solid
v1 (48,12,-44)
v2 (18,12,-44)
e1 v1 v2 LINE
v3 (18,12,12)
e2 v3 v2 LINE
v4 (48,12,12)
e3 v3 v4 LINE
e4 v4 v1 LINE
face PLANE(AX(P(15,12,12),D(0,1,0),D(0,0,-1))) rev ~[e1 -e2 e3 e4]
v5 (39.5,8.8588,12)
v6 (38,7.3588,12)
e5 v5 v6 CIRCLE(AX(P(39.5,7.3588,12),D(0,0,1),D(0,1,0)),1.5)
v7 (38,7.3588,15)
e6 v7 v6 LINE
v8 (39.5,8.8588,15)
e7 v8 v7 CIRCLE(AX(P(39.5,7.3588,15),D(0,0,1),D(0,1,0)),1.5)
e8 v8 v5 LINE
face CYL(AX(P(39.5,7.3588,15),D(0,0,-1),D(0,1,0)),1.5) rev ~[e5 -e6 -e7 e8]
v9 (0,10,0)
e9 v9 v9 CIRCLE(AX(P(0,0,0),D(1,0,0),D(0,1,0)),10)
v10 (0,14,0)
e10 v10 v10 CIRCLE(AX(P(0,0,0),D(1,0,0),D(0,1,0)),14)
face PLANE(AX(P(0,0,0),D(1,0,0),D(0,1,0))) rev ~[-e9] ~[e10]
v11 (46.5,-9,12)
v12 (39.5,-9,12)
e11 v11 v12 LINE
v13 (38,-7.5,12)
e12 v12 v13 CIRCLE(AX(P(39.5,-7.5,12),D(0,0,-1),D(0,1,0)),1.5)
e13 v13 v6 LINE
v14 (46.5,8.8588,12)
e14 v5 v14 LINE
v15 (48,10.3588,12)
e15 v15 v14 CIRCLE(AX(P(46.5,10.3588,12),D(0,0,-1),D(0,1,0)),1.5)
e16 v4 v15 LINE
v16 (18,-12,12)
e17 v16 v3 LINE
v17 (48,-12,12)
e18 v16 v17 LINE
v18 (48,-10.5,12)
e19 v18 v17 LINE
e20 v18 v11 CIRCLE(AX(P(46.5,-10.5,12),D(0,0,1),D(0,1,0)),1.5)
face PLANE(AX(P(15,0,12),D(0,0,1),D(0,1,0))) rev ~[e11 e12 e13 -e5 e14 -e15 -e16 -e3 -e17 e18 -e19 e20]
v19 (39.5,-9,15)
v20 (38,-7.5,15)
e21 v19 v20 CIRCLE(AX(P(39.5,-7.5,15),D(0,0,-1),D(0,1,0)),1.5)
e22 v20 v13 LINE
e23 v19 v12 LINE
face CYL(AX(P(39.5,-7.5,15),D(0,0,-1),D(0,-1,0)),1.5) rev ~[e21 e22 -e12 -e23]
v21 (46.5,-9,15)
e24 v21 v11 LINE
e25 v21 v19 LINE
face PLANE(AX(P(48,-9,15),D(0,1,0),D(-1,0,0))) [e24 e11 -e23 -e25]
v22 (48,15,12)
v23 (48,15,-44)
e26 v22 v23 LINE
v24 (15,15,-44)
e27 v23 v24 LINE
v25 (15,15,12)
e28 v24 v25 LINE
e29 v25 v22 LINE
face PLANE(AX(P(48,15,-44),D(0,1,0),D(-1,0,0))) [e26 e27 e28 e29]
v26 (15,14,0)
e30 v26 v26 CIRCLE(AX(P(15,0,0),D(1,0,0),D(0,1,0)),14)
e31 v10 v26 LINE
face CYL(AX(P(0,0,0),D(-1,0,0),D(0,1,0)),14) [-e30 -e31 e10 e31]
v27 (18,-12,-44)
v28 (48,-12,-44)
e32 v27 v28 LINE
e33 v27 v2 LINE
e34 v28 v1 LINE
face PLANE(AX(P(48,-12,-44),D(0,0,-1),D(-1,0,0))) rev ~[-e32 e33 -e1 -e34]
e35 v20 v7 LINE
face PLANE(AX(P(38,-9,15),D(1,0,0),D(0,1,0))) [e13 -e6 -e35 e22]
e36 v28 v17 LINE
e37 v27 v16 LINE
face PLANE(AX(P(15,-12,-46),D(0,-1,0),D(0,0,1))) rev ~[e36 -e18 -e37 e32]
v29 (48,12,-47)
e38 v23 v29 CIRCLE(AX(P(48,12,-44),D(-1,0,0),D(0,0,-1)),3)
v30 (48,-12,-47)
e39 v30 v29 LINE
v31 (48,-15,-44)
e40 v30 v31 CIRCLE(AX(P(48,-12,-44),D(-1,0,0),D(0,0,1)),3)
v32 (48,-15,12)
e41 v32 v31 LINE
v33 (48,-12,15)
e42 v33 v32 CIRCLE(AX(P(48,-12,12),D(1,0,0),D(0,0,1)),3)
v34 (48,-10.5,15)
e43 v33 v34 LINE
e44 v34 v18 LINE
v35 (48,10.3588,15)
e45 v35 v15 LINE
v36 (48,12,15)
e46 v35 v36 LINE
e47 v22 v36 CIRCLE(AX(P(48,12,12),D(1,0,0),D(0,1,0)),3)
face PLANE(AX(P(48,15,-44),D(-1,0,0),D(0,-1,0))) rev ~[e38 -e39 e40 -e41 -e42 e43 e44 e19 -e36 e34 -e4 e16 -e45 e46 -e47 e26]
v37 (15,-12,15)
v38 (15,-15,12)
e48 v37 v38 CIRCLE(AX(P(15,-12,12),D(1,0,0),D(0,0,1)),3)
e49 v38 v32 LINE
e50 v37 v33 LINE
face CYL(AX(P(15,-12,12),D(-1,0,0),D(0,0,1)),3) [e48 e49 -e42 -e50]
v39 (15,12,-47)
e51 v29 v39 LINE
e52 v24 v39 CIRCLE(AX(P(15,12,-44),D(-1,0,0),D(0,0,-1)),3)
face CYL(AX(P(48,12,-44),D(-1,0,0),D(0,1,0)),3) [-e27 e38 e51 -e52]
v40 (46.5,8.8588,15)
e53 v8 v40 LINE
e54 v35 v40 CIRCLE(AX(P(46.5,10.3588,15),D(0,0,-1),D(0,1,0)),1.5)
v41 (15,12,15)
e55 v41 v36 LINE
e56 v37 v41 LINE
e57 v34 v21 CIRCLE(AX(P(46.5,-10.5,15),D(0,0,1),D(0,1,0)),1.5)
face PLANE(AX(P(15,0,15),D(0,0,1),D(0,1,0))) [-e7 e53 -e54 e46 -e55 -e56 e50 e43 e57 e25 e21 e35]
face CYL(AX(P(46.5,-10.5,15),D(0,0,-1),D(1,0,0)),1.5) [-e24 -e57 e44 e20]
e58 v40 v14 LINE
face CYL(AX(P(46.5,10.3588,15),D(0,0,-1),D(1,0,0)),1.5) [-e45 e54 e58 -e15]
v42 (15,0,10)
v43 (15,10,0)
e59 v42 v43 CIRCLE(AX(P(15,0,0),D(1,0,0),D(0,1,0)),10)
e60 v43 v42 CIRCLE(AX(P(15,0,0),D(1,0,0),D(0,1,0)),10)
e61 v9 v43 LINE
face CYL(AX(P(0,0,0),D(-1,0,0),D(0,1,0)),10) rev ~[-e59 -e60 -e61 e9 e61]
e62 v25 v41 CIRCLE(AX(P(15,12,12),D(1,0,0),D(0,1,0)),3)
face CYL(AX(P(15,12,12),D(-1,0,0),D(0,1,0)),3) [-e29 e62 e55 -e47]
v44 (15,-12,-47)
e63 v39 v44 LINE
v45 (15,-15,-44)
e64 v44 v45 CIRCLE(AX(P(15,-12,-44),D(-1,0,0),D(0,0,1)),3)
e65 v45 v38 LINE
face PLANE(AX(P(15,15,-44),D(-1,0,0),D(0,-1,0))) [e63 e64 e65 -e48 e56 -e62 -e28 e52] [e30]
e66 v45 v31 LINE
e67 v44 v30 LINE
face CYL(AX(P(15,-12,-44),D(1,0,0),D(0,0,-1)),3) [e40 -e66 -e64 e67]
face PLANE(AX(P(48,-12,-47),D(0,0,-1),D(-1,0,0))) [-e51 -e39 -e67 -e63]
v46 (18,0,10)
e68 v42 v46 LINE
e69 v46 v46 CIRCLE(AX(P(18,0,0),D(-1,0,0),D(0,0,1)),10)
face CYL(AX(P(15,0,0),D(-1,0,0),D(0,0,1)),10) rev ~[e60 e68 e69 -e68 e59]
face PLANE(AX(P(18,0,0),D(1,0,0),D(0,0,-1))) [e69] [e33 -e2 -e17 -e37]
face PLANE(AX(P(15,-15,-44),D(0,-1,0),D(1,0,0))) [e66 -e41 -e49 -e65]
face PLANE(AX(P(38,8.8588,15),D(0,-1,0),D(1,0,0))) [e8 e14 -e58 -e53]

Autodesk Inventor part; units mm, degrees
ref_plane "YZ Plane" through (0, 0, 0) normal (1, 0, 0) x (0, 1, 0)
ref_plane "XZ Plane" through (0, 0, 0) normal (0, 1, 0) x (-1, 0, 0)
ref_plane "XY Plane" through (0, 0, 0) normal (0, 0, 1) x (1, 0, 0)
sketch "Sketch1" plane through (0, 0, 0) normal (1, 0, 0) x (0, 1, 0)
  circle A0 centre (0, 0) radius 10
  circle A1 centre (0, 0) radius 14
  dimension "d0" = 20
  dimension "d1" = 28
extrude "Extrusion1" add sketch "Sketch1" along normal blind 15
sketch "Sketch2" plane through (15, 0, 0) normal (1, 0, 0) x (0, 0, -1)
  point P0 (0, 0)
sketch "Sketch3" plane through (15, 0, 0) normal (1, 0, 0) x (0, 0, -1)
  circle A0 centre (0, 0) radius 10 projected
  line L0 (-12, 0) -> (-12, 12)
  line L1 (-12, 12) -> (46, 12)
  line L2 (46, 12) -> (46, -12)
  line L3 (46, -12) -> (-12, -12)
  line L4 (-12, -12) -> (-12, 0)
  line L5 (-15, 0) -> (-15, -12)
  line L6 (-15, 0) -> (-15, 12)
  line L7 (-12, 15) -> (46, 15)
  line L8 (49, 12) -> (49, -12)
  line L9 (46, -15) -> (-12, -15)
  arc A1 (49, 12) -> (46, 15) centre (46, 12) ccw
  arc A2 (46, -15) -> (49, -12) centre (46, -12) ccw
  arc A3 (-15, -12) -> (-12, -15) centre (-12, -12) ccw
  arc A4 (-12, 15) -> (-15, 12) centre (-12, 12) ccw
extrude "Extrusion2" add sketch "Sketch3" along normal blind 33 contours L6 A4 L7 A1 L8 A2 L9 A3 L5
sketch "Sketch4" plane through (15, 0, 0) normal (1, 0, 0) x (0, 0, -1)
  line L0 (-12, -12) -> (-12, 12) projected
  line L1 (7.2111, 12) -> (46, 12) projected
  line L2 (-12, 12) -> (46, 12)
  line L3 (46, 12) -> (46, -12)
  line L4 (46, -12) -> (-12, -12) projected
  line L5 (46, -12) -> (-12, -12)
  line L6 (-12, 12) -> (46, 12) projected
  line L7 (-12, -12) -> (-12, 12)
  point P0 (0, 0)
extrude "Extrusion3" add sketch "Sketch4" along normal blind 3
sketch "Sketch5" plane through (15, 0, 0) normal (-1, 0, 0) x (0, 0, 1)
  circle A0 centre (0, 0) radius 10
extrude "Extrusion4" cut sketch "Sketch5" against normal blind 3
sketch "Sketch6" plane through (15, -12, -49) normal (0, 0, -1) x (-1, 0, 0)
  point P0 (15, 12)
sketch "Sketch7" plane through (15, -12, -49) normal (0, 0, -1) x (-1, 0, 0)
  line L0 (0, 0) -> (0, -3) projected
  line L1 (0, -3) -> (0, 27)
  point P0 (15, 12)
  dimension "d22" = 30
sketch "Sketch8" plane through (15, -12, -49) normal (0, 0, -1) x (-1, 0, 0)
  point P0 (0, -3)
  point P1 (-3, 0)
sketch "Sketch9" plane through (15, -12, -49) normal (0, 0, -1) x (-1, 0, 0)
  line L0 (0, 27) -> (0, 24) projected
  line L1 (0, 27) -> (-64, 27)
  line L2 (-64, 27) -> (-64, -3)
  line L3 (0, -3) -> (-33, -3) projected
  line L4 (-64, -3) -> (0, -3)
  line L5 (0, -3) -> (0, 27)
  line L6 (0, 0) -> (0, 24) projected
  line L7 (-3, 24) -> (-3, 0) projected
  line L8 (-3, 0) -> (-3, 24)
  line L9 (0, 24) -> (-33, 24) projected
  line L10 (-3, 24) -> (-61, 24)
  line L11 (-61, 24) -> (-61, 0)
  line L12 (-61, 0) -> (-3, 0)
  line L13 (0, 0) -> (-33, 0) projected
  point P0 (15, 12)
  dimension "d27" = 64
  dimension "d28" = 30
  dimension "d29" = 58
extrude "Extrusion5" add sketch "Sketch9" along normal blind 30 contours L0 L9 L10 L11 L12 L13 L5 L3 L4 L2 L1 | L5 L13 L7 L9
sketch "Sketch10" plane through (48, 12, -49) normal (0, 0, -1) x (-1, 0, 0)
  line L0 (33, 3) -> (-31, 3) projected
  line L1 (33, 3) -> (33, 0) projected
  line L2 (-31, 3) -> (33, 3)
  line L3 (33, 3) -> (33, -27)
  line L4 (33, 0) -> (33, -24) projected
  line L5 (-31, 3) -> (-31, -27) projected
  line L6 (33, -27) -> (-31, -27)
  line L7 (-31, -27) -> (-31, 3)
  point P0 (48, -12)
  dimension "d32" = 30
extrude "Extrusion6" add sketch "Sketch10" against normal blind 5
fillet "Fillet1" radius 3 2 edges at (79, 15, -61.5) (79, -15, -61.5)
sketch "Sketch11" plane through (48, 12, -44) normal (0, 0, 1) x (1, 0, 0)
  line L0 (31, -24) -> (31, 0) projected
  line L1 (31, -12) -> (29, -12)
  line L2 (29, -12) -> (19, -12)
  circle A0 centre (19, -12) radius 10
  point P0 (-48, -12)
  dimension "d36" = 2
  dimension "d37" = 10
extrude "Extrusion7" cut sketch "Sketch11" against normal blind 10.5
sketch "Sketch12" plane through (48, 12, -44) normal (0, 0, 1) x (1, 0, 0)
  arc A0 (28, -7.6411) -> (28, -16.3589) centre (19, -12) ccw projected
  circle A1 centre (19, -12) radius 10
  circle A2 centre (19, -12) radius 10 projected
  circle A3 centre (19, -12) radius 14
  point P0 (-48, -12)
  point P1 (28, -16.3589)
  dimension "d40" = 28
extrude "Extrusion8" add sketch "Sketch12" along normal blind 15
sketch "Sketch13" plane through (15, -12, 15) normal (0, 0, 1) x (1, 0, 0)
  line L0 (33, 0) -> (3, 0) projected
  line L1 (0, -3) -> (33, -3) projected
  line L2 (30.6116, 0) -> (33.6116, 0) construction
  line L3 (33, 0) -> (33, 24) projected
  line L4 (33, 3) -> (23, 3)
  line L5 (23, 3) -> (23, 20.8588)
  line L6 (23, 20.8588) -> (33, 20.8588)
  point P0 (-15, 12)
extrude "Extrusion9" cut sketch "Sketch13" against normal blind 21.75
sketch "Sketch14" plane through (79, -12, -79) normal (1, 0, 0) x (0, 0, -1)
  line L0 (-35, 24) -> (0, 24) projected
  line L1 (-3.7826, 24) -> (-0.7826, 24) construction
  line L2 (0, 0) -> (-35, 0) projected
  line L3 (-3.2489, 0) -> (-0.2489, 0) construction
  line L4 (0, 24) -> (0, 0) projected
  line L5 (0, 3) -> (-10, 3)
  line L6 (0, 3) -> (10, 3) construction
  line L7 (-10, 3) -> (-10, 21)
  line L8 (-10, 21) -> (0, 21)
  point P0 (-79, 12)
  dimension "d53" = 10
  dimension "d54" = 180
extrude "Extrusion10" cut sketch "Sketch14" against normal blind 25.75
sketch "Sketch15" plane through (15, -12, -79) normal (0, 0, -1) x (-1, 0, 0)
  line L0 (8.5716, 47.3564) -> (-2.6139, -49.713)
  line L1 (-2.6139, -49.713) -> (-66.1269, -32.0991)
  line L2 (-66.1269, -32.0991) -> (-83.6498, 8.8041)
  line L3 (-83.6498, 8.8041) -> (-71.64, 52.1092)
  line L4 (-71.64, 52.1092) -> (-17.9136, 47.3564)
  arc A0 (-17.9136, 47.3564) -> (-17.9136, 47.3564) centre (-16.407, 64.3867) ccw
  line L5 (-17.9136, 47.3564) -> (8.5716, 47.3564)
  point P0 (15, 12)
extrude "Extrusion11" cut sketch "Sketch15" against normal blind 30 contours L0 L1 L2 L3 L4 A0 L5 | A0 L5 picked at (-16.2394, 47.3367)
sketch "Sketch16" plane through (15, 15, 12) normal (0, 1, 0) x (1, 0, 0)
  line L0 (33, 56) -> (33, 0) projected
  line L1 (33, 35.3995) -> (33, 94.1554)
  line L2 (33, 94.1554) -> (79.7551, 84.127)
  line L3 (79.7551, 84.127) -> (69.5982, 12)
  line L4 (69.5982, 12) -> (67.3209, 12.3207)
  line L5 (67.3209, 12.3207) -> (33, 35.3995)
  point P0 (-15, 12)
extrude "Extrusion12" cut sketch "Sketch16" against normal blind 77.25
sketch "Sketch18" plane through (48, -15, -49) normal (0, 0, -1) x (-1, 0, 0)
  point P0 (48, 15)
fillet "Fillet2" radius 3 2 edges at (31.5, 15, -49) (31.5, -15, -49)
sketch "Sketch19" plane through (48, -12, -49) normal (0, 0, -1) x (-1, 0, 0)
  line L0 (-10.3978, 34.6876) -> (55.1217, 36.4172)
  line L1 (55.1217, 36.4172) -> (42.8113, -19.5389)
  line L2 (42.8113, -19.5389) -> (-1.2413, -25.4397)
  arc A0 (-1.2413, -25.4397) -> (-3.1744, -22.4893) centre (-5.2865, -25.9815) ccw
  line L3 (-3.1744, -22.4893) -> (-13.3482, 5.1835)
  arc A1 (-13.3482, 5.1835) -> (-11.3134, 8.4392) centre (-14.4287, 8.1225) ccw
  line L4 (-11.3134, 8.4392) -> (-10.3978, 34.6876)
  point P0 (48, 12)
extrude "Extrusion13" cut sketch "Sketch19" against normal blind 5
sketch "Sketch20" plane through (48, -12, -44) normal (0, 0, -1) x (-1, 0, 0)
  line L0 (0, 27) -> (0, 24) projected
  line L1 (0, 27) -> (33, 27)
  line L2 (33, 0) -> (33, -3) projected
  line L3 (33, 27) -> (33, -3)
  line L4 (33, -3) -> (0, -3) projected
  line L5 (33, -3) -> (0, -3)
  line L6 (0, -3) -> (0, 27)
  point P0 (48, 12)
extrude "Extrusion14" add sketch "Sketch20" along normal blind 3
fillet "Fillet3" radius 3 2 edges at (31.5, 15, -47) (31.5, -15, -47)
fillet "Fillet4" radius 1.5 4 edges at (48, 8.8588, 13.5) (38, 8.8588, 13.5) (38, -9, 13.5) (48, -9, 13.5)
properties part number "servo holder 1"
